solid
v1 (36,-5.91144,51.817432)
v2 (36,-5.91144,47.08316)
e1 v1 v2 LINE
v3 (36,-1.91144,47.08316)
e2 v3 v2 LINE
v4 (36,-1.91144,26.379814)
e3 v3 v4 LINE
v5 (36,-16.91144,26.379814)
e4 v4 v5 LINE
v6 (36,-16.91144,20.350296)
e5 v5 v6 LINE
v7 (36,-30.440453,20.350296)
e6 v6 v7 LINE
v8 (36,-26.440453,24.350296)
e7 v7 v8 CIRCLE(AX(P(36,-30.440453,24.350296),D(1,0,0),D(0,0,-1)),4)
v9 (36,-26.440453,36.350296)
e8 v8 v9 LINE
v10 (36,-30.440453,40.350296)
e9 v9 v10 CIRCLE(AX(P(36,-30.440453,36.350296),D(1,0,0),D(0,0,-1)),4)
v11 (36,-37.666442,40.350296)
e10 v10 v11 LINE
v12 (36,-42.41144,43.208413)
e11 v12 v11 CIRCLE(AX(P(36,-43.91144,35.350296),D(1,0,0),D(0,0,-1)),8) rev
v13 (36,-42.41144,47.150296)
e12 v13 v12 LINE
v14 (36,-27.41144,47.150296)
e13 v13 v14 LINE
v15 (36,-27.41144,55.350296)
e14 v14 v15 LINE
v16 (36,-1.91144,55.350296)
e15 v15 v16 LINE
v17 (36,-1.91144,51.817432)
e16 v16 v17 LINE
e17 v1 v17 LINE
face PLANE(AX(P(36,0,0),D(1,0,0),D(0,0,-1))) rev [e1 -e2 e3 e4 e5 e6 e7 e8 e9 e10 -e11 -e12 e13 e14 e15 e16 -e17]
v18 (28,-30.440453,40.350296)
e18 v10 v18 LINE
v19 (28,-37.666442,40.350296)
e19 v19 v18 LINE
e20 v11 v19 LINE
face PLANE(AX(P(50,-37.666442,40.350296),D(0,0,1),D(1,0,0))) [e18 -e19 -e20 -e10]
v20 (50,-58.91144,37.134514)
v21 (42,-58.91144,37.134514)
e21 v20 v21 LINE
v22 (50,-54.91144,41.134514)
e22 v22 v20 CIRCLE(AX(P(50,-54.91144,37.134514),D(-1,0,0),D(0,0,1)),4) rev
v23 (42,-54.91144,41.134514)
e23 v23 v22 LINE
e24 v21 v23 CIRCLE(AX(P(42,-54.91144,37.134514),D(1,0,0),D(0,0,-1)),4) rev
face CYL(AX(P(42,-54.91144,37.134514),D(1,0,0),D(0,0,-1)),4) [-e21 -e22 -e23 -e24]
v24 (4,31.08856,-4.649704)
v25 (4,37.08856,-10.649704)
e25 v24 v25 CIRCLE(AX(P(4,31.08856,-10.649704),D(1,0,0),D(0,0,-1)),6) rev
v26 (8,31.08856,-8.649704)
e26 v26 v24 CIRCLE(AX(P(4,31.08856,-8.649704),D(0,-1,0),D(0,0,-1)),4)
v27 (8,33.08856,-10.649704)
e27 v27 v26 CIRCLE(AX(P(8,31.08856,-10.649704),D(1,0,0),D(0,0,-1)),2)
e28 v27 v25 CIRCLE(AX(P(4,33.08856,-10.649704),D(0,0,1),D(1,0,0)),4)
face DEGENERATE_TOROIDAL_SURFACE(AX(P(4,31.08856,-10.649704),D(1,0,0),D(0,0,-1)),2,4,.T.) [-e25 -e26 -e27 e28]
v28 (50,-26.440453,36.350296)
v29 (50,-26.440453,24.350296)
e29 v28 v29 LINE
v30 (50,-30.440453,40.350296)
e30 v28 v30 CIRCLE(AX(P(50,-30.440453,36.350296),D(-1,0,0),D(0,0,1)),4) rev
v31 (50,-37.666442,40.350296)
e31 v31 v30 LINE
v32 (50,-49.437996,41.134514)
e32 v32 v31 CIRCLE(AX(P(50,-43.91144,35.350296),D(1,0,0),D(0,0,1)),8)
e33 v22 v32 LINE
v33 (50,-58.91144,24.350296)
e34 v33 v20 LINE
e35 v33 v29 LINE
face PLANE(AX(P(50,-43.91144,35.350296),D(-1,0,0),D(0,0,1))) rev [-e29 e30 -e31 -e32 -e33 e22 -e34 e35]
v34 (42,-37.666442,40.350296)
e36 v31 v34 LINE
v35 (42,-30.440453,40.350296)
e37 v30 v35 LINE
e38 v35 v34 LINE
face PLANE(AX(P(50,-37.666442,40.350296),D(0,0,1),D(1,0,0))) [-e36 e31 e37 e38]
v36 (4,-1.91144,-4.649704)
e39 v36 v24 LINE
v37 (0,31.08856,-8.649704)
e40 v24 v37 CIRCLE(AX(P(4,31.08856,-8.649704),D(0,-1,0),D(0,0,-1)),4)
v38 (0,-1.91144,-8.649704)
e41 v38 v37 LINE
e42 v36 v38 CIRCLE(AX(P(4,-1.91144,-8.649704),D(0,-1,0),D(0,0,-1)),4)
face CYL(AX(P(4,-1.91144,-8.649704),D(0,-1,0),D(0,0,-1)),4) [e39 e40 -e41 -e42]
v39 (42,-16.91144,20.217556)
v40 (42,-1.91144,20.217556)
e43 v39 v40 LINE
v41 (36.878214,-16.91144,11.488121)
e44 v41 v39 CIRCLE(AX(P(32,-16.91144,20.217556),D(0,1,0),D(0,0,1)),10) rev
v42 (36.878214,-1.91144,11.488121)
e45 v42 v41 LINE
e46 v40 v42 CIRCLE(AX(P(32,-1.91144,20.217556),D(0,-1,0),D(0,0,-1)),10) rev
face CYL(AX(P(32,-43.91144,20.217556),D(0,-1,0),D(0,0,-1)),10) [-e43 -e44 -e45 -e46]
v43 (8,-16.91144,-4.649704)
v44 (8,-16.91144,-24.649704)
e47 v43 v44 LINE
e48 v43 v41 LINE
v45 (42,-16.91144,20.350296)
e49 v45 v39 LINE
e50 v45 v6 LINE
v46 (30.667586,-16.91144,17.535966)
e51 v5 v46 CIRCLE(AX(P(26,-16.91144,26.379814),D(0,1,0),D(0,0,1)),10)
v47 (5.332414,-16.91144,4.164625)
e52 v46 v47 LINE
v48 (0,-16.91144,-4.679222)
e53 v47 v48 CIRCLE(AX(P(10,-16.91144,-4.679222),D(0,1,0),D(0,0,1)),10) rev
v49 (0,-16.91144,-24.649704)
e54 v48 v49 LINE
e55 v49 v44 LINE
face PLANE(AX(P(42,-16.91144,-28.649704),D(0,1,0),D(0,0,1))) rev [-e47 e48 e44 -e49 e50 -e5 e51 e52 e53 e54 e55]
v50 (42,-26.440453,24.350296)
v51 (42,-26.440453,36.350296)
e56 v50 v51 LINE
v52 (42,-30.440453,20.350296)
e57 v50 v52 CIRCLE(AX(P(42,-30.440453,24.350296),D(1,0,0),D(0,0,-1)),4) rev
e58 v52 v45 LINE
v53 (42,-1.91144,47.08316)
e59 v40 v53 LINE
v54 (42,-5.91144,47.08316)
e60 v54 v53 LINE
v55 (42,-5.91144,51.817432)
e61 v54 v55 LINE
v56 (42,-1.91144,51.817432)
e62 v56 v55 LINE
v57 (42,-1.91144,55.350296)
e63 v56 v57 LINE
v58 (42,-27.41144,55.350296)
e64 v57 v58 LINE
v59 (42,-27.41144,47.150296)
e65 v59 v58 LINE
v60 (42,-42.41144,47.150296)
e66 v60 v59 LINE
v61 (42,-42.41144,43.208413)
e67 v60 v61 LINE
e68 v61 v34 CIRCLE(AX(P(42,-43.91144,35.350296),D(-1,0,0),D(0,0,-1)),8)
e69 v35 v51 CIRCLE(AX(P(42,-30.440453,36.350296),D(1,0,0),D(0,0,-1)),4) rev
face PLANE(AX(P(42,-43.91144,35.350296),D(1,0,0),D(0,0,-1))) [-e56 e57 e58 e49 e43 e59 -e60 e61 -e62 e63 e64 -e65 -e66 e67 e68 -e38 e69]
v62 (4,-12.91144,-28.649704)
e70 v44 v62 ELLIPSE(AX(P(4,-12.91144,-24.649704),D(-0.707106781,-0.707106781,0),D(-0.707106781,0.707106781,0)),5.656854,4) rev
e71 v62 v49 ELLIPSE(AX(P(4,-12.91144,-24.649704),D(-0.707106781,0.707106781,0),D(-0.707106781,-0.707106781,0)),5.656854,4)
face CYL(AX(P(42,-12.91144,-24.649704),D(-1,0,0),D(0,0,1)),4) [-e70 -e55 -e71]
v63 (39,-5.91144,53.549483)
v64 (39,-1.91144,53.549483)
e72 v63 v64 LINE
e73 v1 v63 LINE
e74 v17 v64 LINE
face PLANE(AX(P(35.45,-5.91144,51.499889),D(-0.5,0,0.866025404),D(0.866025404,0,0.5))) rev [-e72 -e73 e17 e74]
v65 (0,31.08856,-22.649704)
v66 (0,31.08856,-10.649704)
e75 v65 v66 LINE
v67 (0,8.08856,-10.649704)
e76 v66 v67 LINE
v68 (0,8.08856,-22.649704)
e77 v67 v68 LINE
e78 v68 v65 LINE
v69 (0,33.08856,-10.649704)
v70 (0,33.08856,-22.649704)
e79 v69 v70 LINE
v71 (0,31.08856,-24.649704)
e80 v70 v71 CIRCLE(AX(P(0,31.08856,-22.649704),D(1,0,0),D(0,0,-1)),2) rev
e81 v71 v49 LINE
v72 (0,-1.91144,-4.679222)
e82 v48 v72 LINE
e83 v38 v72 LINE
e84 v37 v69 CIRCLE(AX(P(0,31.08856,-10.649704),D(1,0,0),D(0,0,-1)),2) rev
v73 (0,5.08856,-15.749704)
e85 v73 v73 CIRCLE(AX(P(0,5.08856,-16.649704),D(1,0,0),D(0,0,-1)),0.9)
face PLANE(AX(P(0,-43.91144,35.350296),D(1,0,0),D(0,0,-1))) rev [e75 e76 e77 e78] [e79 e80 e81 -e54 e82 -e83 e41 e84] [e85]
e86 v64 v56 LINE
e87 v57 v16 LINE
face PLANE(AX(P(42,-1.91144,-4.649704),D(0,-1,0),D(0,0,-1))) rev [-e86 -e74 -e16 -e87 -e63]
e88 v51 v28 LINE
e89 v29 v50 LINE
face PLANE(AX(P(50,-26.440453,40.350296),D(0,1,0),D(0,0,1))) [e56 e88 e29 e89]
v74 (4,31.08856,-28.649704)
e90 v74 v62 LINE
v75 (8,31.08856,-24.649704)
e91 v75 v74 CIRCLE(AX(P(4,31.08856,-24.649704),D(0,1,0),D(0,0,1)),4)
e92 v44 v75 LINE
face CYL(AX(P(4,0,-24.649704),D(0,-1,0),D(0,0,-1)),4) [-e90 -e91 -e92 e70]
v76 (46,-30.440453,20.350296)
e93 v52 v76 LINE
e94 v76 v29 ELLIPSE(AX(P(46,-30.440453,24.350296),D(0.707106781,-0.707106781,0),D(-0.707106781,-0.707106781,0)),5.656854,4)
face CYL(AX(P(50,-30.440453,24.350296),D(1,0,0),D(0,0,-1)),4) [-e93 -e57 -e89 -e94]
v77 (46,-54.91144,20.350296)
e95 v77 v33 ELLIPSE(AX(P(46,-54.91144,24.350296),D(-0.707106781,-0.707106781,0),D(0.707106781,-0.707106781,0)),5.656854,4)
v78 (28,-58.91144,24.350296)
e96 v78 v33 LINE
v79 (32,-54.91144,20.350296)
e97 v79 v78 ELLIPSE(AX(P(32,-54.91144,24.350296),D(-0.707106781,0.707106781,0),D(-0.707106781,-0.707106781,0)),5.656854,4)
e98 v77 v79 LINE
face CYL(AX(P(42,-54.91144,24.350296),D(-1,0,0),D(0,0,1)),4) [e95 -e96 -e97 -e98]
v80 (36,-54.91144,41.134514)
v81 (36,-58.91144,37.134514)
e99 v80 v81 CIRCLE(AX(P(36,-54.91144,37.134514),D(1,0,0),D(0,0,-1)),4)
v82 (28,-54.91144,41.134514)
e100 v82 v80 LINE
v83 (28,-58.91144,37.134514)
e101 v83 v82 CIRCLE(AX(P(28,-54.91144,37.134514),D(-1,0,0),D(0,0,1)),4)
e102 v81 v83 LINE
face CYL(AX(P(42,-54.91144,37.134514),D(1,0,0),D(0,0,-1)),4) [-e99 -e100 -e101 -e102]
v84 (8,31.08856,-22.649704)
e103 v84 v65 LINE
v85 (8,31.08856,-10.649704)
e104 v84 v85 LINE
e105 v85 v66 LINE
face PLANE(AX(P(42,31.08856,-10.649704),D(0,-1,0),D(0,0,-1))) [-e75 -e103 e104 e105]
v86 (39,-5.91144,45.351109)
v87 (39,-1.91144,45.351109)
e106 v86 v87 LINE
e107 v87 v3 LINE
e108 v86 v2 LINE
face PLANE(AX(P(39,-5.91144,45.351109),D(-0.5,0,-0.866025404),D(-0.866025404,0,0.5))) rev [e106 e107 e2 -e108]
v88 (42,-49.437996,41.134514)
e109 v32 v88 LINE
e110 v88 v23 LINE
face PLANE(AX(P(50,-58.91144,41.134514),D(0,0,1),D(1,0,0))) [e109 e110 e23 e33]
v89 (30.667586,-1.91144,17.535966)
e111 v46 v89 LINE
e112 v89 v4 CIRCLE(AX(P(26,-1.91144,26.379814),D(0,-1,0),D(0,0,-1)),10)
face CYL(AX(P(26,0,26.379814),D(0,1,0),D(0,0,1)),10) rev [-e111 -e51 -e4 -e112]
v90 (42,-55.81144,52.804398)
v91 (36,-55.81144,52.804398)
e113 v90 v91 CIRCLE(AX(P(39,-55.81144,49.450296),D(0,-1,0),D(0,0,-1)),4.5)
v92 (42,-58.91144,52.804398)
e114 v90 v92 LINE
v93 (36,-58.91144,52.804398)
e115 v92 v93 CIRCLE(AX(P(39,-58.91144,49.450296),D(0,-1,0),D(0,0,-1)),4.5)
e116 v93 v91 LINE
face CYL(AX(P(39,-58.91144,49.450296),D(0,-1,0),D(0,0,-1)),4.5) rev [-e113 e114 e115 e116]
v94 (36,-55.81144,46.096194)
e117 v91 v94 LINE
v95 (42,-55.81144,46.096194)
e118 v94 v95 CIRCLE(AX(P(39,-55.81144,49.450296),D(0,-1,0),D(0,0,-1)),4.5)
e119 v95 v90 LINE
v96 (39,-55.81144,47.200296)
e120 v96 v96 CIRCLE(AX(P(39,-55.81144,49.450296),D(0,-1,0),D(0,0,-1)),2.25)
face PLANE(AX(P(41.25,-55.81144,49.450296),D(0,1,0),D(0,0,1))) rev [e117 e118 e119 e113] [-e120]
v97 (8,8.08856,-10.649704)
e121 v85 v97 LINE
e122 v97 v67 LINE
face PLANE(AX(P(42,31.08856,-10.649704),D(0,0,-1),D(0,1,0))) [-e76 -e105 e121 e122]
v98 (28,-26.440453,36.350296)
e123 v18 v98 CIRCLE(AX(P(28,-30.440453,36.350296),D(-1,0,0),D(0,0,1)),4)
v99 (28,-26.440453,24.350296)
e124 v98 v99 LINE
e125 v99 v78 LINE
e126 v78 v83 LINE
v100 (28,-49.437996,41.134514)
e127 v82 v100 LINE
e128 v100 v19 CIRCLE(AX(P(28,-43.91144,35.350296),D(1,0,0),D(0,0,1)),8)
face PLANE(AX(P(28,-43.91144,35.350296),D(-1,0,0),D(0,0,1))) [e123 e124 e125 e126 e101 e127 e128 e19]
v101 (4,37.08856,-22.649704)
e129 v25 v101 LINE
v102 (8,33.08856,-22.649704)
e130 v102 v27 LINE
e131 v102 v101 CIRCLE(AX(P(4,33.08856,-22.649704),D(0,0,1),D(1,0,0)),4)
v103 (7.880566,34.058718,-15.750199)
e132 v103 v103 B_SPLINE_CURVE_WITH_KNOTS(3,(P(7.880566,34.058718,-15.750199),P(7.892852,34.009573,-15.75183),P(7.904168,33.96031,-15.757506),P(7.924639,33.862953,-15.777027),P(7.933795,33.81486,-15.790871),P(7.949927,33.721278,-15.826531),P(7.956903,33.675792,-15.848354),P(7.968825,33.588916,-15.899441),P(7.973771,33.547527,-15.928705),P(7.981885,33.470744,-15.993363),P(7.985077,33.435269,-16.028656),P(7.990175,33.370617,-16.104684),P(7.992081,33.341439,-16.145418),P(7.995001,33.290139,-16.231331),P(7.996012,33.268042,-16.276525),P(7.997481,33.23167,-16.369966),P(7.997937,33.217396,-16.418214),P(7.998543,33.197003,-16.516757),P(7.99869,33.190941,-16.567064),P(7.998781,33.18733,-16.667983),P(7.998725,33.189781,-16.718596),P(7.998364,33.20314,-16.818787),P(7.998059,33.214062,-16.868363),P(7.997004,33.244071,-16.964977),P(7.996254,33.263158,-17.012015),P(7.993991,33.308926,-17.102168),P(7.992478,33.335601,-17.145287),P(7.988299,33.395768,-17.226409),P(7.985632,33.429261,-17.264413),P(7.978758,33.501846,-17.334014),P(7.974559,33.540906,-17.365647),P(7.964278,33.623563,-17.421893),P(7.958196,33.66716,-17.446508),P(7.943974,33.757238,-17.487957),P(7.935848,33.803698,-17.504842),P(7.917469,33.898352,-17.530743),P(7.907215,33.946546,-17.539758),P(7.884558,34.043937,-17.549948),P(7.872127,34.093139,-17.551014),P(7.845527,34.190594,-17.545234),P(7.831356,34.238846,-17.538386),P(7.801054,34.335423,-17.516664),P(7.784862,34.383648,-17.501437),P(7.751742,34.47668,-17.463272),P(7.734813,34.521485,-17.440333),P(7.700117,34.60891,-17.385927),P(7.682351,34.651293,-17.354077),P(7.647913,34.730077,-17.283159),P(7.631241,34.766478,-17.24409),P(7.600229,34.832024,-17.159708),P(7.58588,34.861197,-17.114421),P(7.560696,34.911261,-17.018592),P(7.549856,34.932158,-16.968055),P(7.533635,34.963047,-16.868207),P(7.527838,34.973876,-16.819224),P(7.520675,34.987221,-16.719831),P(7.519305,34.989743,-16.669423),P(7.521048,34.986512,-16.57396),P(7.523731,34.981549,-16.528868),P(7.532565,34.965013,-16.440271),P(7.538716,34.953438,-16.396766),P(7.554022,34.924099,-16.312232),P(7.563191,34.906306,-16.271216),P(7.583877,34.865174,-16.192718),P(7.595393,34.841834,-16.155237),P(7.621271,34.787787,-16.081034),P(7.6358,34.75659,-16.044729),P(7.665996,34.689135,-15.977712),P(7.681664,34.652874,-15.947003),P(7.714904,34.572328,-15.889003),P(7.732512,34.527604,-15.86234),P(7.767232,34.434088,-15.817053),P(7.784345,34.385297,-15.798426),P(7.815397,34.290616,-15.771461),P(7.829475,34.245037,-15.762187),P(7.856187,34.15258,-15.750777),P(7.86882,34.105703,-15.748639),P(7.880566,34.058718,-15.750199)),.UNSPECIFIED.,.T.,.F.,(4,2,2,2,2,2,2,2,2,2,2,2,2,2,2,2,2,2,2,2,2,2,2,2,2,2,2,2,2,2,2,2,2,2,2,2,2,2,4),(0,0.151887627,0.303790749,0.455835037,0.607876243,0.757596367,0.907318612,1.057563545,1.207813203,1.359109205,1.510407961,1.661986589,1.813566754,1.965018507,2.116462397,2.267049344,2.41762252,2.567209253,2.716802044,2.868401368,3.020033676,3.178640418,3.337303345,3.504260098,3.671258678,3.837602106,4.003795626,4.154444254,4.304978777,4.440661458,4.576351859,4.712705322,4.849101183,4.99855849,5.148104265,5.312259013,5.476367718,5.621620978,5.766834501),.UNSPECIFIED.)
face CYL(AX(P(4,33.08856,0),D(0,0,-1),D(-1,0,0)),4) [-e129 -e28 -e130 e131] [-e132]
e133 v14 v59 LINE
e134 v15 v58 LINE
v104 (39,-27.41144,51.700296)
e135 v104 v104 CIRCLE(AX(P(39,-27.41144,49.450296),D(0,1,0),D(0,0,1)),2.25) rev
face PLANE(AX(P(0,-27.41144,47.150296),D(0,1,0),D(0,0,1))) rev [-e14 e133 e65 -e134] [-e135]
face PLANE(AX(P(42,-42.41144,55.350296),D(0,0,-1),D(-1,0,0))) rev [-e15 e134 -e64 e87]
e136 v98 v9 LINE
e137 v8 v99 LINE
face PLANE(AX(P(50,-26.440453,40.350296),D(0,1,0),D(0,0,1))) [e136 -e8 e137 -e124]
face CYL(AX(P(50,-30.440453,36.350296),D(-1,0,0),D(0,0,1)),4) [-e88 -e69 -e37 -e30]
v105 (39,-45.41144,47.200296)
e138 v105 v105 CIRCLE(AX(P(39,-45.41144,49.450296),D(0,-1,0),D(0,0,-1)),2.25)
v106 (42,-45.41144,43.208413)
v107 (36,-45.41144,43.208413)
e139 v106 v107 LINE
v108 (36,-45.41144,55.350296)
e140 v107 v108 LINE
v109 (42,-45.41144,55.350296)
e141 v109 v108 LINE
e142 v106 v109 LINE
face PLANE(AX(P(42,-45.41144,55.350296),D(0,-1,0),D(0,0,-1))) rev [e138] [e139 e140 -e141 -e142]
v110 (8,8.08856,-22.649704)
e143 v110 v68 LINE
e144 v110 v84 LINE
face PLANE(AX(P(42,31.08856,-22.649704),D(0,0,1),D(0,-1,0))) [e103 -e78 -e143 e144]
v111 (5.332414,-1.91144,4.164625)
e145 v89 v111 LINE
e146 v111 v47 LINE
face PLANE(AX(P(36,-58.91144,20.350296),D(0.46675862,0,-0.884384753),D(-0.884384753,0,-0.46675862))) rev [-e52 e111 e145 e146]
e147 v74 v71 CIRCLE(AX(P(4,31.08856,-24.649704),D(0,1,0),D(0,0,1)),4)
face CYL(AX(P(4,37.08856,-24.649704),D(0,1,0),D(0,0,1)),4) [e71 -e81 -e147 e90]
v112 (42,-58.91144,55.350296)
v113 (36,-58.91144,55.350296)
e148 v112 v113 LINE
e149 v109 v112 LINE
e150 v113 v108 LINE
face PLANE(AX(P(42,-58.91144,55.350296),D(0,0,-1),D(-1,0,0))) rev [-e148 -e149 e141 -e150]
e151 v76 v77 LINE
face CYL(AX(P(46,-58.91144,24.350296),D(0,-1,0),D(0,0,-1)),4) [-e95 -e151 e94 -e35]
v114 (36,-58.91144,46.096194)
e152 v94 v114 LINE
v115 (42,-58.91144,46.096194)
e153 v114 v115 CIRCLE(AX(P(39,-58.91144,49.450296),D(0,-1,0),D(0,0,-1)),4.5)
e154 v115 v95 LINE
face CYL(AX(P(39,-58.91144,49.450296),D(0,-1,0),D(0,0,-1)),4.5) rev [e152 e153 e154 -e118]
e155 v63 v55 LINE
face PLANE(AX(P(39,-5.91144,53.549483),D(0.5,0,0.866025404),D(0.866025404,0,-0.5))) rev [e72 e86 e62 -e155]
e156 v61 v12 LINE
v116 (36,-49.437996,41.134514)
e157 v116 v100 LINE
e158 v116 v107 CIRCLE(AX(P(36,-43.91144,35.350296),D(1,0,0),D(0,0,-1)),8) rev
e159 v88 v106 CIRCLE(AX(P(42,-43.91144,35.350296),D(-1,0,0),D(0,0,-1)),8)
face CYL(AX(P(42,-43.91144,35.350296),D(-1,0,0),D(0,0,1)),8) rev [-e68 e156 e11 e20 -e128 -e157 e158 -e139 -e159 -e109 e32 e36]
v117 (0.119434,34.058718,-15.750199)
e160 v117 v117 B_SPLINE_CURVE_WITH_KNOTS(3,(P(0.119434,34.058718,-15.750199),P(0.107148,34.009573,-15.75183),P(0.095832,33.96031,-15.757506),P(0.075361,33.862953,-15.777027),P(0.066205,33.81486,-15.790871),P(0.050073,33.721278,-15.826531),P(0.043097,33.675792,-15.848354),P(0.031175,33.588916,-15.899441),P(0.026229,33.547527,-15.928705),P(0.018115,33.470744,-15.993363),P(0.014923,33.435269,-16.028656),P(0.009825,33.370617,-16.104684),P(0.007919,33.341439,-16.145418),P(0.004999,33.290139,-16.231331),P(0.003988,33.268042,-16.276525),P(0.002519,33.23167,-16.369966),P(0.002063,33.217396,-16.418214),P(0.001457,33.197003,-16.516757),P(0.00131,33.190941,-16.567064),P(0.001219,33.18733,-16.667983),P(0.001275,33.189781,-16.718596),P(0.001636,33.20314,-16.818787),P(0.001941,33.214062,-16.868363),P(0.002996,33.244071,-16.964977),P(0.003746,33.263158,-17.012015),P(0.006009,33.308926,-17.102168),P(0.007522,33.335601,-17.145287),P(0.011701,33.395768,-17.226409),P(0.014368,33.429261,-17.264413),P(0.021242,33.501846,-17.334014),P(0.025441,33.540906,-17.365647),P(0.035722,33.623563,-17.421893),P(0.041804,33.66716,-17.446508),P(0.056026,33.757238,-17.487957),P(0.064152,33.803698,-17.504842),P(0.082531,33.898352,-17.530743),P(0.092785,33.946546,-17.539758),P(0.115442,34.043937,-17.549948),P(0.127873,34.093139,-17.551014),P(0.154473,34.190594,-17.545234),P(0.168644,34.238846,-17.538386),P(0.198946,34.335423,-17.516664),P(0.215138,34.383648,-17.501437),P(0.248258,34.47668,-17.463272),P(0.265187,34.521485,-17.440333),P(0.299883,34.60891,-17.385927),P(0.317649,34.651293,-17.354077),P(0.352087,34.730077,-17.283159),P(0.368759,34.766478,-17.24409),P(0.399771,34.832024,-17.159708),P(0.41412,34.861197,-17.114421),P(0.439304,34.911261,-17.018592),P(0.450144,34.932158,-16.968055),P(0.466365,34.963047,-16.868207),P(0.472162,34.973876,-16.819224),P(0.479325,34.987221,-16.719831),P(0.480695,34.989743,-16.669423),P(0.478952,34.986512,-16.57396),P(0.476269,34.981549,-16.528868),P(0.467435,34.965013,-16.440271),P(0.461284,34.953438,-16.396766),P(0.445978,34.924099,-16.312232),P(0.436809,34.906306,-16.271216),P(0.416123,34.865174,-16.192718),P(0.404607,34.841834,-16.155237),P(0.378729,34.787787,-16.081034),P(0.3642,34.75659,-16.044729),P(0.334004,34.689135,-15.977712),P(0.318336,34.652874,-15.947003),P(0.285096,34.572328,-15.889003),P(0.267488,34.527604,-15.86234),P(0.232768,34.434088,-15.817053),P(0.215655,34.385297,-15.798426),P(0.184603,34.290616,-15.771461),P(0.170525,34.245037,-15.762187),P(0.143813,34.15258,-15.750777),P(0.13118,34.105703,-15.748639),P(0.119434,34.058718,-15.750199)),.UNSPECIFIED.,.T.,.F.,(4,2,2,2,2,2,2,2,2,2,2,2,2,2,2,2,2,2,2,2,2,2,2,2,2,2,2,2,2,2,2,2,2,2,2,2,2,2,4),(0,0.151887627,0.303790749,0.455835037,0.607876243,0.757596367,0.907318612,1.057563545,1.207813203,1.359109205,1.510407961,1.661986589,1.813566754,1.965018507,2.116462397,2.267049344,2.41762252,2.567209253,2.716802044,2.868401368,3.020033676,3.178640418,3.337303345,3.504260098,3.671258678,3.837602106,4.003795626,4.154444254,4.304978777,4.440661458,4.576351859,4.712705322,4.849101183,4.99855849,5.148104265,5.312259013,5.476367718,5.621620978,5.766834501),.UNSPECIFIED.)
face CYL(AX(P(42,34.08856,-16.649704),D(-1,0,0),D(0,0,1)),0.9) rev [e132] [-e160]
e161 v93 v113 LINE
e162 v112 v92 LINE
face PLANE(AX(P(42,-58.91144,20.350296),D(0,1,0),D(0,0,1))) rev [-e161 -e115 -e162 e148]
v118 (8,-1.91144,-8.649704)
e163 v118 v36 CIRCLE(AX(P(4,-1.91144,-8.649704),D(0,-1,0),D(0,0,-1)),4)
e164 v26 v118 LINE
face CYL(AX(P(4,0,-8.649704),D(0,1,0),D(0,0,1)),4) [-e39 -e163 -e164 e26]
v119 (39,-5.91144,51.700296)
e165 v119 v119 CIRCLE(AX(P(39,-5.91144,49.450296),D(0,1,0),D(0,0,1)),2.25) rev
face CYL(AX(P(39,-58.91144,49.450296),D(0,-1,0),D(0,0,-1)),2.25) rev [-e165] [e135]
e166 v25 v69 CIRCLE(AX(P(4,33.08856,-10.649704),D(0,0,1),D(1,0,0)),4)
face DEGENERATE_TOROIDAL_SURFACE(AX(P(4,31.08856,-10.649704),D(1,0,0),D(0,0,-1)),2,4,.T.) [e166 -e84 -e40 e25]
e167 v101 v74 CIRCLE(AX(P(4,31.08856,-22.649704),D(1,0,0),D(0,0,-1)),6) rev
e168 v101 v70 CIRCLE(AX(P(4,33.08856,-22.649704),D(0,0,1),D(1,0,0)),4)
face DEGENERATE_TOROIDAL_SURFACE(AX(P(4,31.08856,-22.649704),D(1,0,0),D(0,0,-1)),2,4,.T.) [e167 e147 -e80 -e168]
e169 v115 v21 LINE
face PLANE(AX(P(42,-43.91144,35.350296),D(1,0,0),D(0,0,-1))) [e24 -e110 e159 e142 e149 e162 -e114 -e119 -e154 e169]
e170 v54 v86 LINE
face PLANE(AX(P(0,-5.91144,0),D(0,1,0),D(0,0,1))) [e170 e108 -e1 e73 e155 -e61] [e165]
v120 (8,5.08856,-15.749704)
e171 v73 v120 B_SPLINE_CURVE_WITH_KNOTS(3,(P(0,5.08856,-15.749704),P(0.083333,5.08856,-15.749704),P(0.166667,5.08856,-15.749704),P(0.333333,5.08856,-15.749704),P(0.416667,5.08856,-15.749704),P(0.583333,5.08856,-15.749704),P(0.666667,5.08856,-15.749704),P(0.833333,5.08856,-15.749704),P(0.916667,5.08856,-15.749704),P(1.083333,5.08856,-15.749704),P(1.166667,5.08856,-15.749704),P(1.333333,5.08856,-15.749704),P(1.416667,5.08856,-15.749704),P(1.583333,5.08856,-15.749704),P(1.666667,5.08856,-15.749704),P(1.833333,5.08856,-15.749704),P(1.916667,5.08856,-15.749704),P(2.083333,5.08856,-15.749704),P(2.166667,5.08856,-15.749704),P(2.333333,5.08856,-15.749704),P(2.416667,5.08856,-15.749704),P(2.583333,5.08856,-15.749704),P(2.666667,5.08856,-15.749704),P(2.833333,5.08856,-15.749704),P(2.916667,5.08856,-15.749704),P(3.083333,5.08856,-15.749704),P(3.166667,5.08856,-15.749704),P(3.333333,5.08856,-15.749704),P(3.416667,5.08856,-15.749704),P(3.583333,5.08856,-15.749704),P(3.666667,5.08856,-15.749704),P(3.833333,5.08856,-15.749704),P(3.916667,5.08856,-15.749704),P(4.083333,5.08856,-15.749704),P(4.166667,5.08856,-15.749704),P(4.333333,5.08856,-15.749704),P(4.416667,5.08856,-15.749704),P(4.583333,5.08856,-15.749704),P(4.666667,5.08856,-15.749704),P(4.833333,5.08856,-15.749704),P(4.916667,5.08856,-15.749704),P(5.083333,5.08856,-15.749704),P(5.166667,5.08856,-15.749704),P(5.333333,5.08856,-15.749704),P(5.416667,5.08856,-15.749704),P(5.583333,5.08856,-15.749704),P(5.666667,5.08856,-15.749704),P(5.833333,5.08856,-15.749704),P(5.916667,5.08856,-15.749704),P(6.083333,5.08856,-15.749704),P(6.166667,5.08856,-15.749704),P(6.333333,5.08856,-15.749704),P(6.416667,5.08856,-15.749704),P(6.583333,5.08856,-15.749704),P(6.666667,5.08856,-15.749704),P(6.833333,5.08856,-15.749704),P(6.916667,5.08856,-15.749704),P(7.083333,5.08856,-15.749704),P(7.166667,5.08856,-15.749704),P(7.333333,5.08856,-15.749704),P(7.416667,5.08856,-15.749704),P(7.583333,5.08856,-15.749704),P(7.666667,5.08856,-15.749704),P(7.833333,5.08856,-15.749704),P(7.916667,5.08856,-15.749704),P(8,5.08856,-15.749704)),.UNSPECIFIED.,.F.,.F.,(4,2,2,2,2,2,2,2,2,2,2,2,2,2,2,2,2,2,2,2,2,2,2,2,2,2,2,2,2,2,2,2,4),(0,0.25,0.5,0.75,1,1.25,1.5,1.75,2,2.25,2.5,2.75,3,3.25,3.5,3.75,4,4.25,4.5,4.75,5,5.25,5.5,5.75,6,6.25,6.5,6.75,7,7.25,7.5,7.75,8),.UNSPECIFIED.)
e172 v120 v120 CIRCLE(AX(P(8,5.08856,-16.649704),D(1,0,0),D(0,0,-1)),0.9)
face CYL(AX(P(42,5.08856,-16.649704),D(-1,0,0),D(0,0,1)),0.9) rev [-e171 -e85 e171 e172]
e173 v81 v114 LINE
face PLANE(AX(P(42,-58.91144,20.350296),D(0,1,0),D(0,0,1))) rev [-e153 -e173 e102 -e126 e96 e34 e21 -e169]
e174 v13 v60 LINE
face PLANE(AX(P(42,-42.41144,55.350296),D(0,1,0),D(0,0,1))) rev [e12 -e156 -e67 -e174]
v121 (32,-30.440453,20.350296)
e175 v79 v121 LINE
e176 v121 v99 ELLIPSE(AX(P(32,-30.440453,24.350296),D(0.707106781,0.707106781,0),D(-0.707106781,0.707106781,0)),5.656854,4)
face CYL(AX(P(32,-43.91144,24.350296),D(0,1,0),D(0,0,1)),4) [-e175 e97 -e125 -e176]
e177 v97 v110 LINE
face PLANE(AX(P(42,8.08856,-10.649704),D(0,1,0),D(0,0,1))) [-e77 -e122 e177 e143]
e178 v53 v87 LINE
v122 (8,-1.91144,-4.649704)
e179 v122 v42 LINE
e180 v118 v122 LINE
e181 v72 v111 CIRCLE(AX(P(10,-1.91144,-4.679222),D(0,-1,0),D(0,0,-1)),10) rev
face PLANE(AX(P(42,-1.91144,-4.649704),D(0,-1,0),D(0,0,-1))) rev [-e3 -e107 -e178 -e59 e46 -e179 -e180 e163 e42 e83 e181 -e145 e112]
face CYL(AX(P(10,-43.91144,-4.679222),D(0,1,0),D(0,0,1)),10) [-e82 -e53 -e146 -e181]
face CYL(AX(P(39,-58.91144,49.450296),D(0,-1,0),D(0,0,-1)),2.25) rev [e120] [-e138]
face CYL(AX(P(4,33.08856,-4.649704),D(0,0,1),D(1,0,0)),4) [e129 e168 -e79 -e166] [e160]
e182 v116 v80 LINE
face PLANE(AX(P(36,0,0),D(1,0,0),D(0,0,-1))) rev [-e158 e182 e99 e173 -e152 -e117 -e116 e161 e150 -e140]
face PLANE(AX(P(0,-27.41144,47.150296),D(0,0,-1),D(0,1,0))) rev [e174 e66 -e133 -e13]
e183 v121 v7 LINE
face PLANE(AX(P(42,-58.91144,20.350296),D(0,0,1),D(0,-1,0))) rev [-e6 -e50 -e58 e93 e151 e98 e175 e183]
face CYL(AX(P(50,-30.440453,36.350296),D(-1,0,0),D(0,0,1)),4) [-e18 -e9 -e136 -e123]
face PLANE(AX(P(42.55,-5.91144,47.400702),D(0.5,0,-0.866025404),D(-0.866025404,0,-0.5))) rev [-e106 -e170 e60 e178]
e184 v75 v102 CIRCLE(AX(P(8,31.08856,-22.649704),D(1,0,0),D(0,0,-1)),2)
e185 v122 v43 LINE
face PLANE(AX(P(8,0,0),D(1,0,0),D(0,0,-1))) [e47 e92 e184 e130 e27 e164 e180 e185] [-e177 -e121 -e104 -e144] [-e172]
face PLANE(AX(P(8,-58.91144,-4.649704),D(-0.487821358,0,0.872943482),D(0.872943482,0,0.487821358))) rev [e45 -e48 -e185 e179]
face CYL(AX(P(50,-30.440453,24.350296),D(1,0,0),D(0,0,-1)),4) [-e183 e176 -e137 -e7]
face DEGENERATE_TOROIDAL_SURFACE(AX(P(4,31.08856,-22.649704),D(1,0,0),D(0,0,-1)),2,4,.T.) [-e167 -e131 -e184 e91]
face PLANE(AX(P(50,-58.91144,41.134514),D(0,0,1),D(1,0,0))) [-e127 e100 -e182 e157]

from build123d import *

# Parameters (mm, degrees)
SKETCH1_R                                        = 0.9
SKETCH1_W                                        = 12
SKETCH1_H                                        = 23
BOSS_EXTRUDE1_DEPTH                              = 42
CBORE_FOR_M4_PAN_HEAD_MACHINE_SCREW2_D           = 4.5
CBORE_FOR_M4_PAN_HEAD_MACHINE_SCREW2_CBORE_D     = 9
CBORE_FOR_M4_PAN_HEAD_MACHINE_SCREW2_CBORE_DEPTH = 3.1
CUT_EXTRUDE2_DEPTH                               = 4
SKETCH11_W                                       = 35
SKETCH11_H                                       = 57
CUT_EXTRUDE3_DEPTH                               = 36
SKETCH12_W                                       = 24
SKETCH12_H                                       = 54
CUT_EXTRUDE4_DEPTH                               = 34
BOSS_EXTRUDE2_DEPTH                              = 8
BOSS_EXTRUDE2_DEPTH_BACK                         = 14
FILLET3_R                                        = 4
SKETCH14_W                                       = 8.2
SKETCH14_H                                       = 15
CUT_EXTRUDE5_DEPTH                               = 92.094527719
FILLET4_R                                        = 6
FILLET5_R                                        = 4
CUT_EXTRUDE6_DEPTH                               = 94.87574371
FILLET6_R                                        = 10


with BuildPart() as part:
    # Sketch1 → Boss-Extrude1 (new body)
    with BuildSketch(Plane(origin=(0, 0, 0), x_dir=(0, 0, -1), z_dir=(1, 0, 0))):
        with BuildLine():
            Line((-55.350295908, -42.411439664), (-43.208412731, -42.411439664))
            ThreePointArc((-43.208412731, -42.411439664), (-27.350295908, -43.911439664), (-43.208412731, -45.411439664))
            Line((-43.208412731, -45.411439664), (-55.350295908, -45.411439664))
            Line((-55.350295908, -45.411439664), (-55.350295908, -58.911439664))
            Line((-55.350295908, -58.911439664), (-20.350295908, -58.911439664))
            Line((-20.350295908, -58.911439664), (-20.350295908, -16.911439664))
            Line((-20.350295908, -16.911439664), (28.649704092, -16.911439664))
            Line((28.649704092, -16.911439664), (28.649704092, 37.088560336))
            Line((28.649704092, 37.088560336), (4.649704092, 37.088560336))
            Line((4.649704092, 37.088560336), (4.649704092, -1.911439664))
            Line((4.649704092, -1.911439664), (-55.350295908, -1.911439664))
            Line((-55.350295908, -1.911439664), (-55.350295908, -28.911439664))
            Line((-55.350295908, -28.911439664), (-55.350295908, -42.411439664))
        make_face()
        with Locations(Location((16.649704092, 34.088560336, 0), (0, 0, 180))):
            Circle(SKETCH1_R, mode=Mode.SUBTRACT)
        with Locations(Location((16.649704092, 5.088560336, 0), (0, 0, 180))):
            Circle(SKETCH1_R, mode=Mode.SUBTRACT)
        with Locations((16.649704092, 19.588560336)):
            Rectangle(SKETCH1_W, SKETCH1_H, mode=Mode.SUBTRACT)
    extrude(amount=BOSS_EXTRUDE1_DEPTH)

    # CBORE for M4 Pan Head Machine Screw2 (through all)
    with Locations(Plane(origin=(0, -58.911439664, 0), x_dir=(-1, 0, 0), z_dir=(0, -1, 0))):
        with Locations((-39, -49.450295908)):
            CounterBoreHole(CBORE_FOR_M4_PAN_HEAD_MACHINE_SCREW2_D / 2, CBORE_FOR_M4_PAN_HEAD_MACHINE_SCREW2_CBORE_D / 2, CBORE_FOR_M4_PAN_HEAD_MACHINE_SCREW2_CBORE_DEPTH)

    # Sketch7 → Cut-Extrude2 (cut)
    with BuildSketch(Plane(origin=(0, -1.911439664, 0), x_dir=(1, 0, 0), z_dir=(0, 1, 0))):
        Polygon((42.55, -51.499889363), (42.55, -47.400702452), (39, -45.351108997), (35.45, -47.400702452), (35.45, -51.499889363), (39, -53.549482819), align=None)
    extrude(amount=-CUT_EXTRUDE2_DEPTH, mode=Mode.SUBTRACT)

    # Sketch11 → Cut-Extrude3 (cut)
    with BuildSketch(Plane.ZY):
        with Locations((37.850295908, -30.411439664)):
            Rectangle(SKETCH11_W, SKETCH11_H)
    extrude(amount=-CUT_EXTRUDE3_DEPTH, mode=Mode.SUBTRACT)

    # Sketch12 → Cut-Extrude4 (cut)
    with BuildSketch(Plane(origin=(42, 0, 0), x_dir=(0, 0, -1), z_dir=(1, 0, 0))):
        with Locations((16.649704092, 10.088560336)):
            Rectangle(SKETCH12_W, SKETCH12_H)
    extrude(amount=-CUT_EXTRUDE4_DEPTH, mode=Mode.SUBTRACT)

    # Sketch13 → Boss-Extrude2 (add, two sides: drawn at the far end of the back side and taken through both)
    with BuildSketch(Plane.ZY.offset(-36).offset(-BOSS_EXTRUDE2_DEPTH_BACK)):
        with BuildLine():
            Line((40.350295908, -37.666441665), (40.350295908, -26.440452892))
            Line((40.350295908, -26.440452892), (20.350295908, -26.440452892))
            Line((20.350295908, -26.440452892), (20.350295908, -58.911439664))
            Line((20.350295908, -58.911439664), (41.134513551, -58.911439664))
            Line((41.134513551, -58.911439664), (41.134513551, -49.437996119))
            ThreePointArc((41.134513551, -49.437996119), (27.36798978, -44.443218651), (40.350295908, -37.666441665))
        make_face()
    extrude(amount=BOSS_EXTRUDE2_DEPTH + BOSS_EXTRUDE2_DEPTH_BACK)

    # Fillet3
    fillet3_edges = [part.edges().sort_by_distance(p)[0] for p in [
        (32, -58.911439664, 41.134513551),
        (32, -26.440452892, 20.350295908),
        (32, -26.440452892, 40.350295908),
        (46, -58.911439664, 41.134513551),
        (50, -42.675946278, 20.350295908),
        (46, -26.440452892, 20.350295908),
        (46, -26.440452892, 40.350295908),
        (28, -42.675946278, 20.350295908),
        (39, -58.911439664, 20.350295908),
    ]]
    fillet(fillet3_edges, radius=FILLET3_R)

    # Sketch14 → Cut-Extrude5 (cut, through all)
    with BuildSketch(Plane(origin=(42, 0, 0), x_dir=(0, 0, -1), z_dir=(1, 0, 0))):
        with Locations((-51.250295908, -34.911439664)):
            Rectangle(SKETCH14_W, SKETCH14_H)
    extrude(amount=-CUT_EXTRUDE5_DEPTH, mode=Mode.SUBTRACT)

    # Fillet4
    fillet4_edges = [part.edges().sort_by_distance(p)[0] for p in [
        (4, 37.088560336, -4.649704092),
        (4, 37.088560336, -28.649704092),
    ]]
    fillet(fillet4_edges, radius=FILLET4_R)

    # Fillet5
    # the kernel refuses this fillet: 4 mm, written as the material it takes off along each edge
    with BuildSketch(Plane(origin=(0, 31.088560336, -4.649704092), x_dir=(0, 0, -1), z_dir=(0, -1, 0))) as fillet5_piece_1:
        with BuildLine():
            CenterArc((FILLET5_R, FILLET5_R), FILLET5_R, 180, 90)
            Line((0, FILLET5_R), (0, 0))
            Line((0, 0), (FILLET5_R, 0))
        make_face()
    extrude(amount=33, mode=Mode.SUBTRACT)
    with BuildSketch(Plane(origin=(0, 31.088560336, -10.649704092), x_dir=(0, 0, 1), z_dir=(0, -1, 0))) as fillet5_piece_2:
        with BuildLine():
            CenterArc((6 - FILLET5_R, -FILLET5_R), FILLET5_R, 0, 90)
            Line((6, -FILLET5_R), (6, 0))
            Line((6, 0), (6 - FILLET5_R, 0))
        make_face()
    revolve(axis=Axis((0, 31.088560336, -10.649704092), (-1, 0, 0)), revolution_arc=90, mode=Mode.SUBTRACT)
    with BuildSketch(Plane(origin=(0, 37.088560336, -22.649704092), x_dir=(0, -1, 0), z_dir=(0, 0, 1))) as fillet5_piece_3:
        with BuildLine():
            CenterArc((FILLET5_R, FILLET5_R), FILLET5_R, 180, 90)
            Line((0, FILLET5_R), (0, 0))
            Line((0, 0), (FILLET5_R, 0))
        make_face()
    extrude(amount=12, mode=Mode.SUBTRACT)
    with BuildSketch(Plane(origin=(0, 31.088560336, -22.649704092), x_dir=(0, 0, -1), z_dir=(0, -1, 0))) as fillet5_piece_4:
        with BuildLine():
            CenterArc((6 - FILLET5_R, FILLET5_R), FILLET5_R, 270, 90)
            Line((6, FILLET5_R), (6, 0))
            Line((6, 0), (6 - FILLET5_R, 0))
        make_face()
    revolve(axis=Axis((0, 31.088560336, -22.649704092), (1, 0, 0)), revolution_arc=90, mode=Mode.SUBTRACT)
    with BuildSketch(Plane(origin=(8, -1.911439664, -4.649704092), x_dir=(-1, 0, 0), z_dir=(0, 1, 0))) as fillet5_piece_5:
        with BuildLine():
            CenterArc((FILLET5_R, -FILLET5_R), FILLET5_R, 90, 90)
            Line((0, -FILLET5_R), (0, 0))
            Line((0, 0), (FILLET5_R, 0))
        make_face()
    extrude(amount=33, mode=Mode.SUBTRACT)
    with BuildSketch(Plane(origin=(8, 31.088560336, -10.649704092), x_dir=(0, 0, 1), z_dir=(0, -1, 0))) as fillet5_piece_6:
        with BuildLine():
            CenterArc((6 - FILLET5_R, FILLET5_R), FILLET5_R, 270, 90)
            Line((6 - FILLET5_R, 0), (6, 0))
            Line((6, 0), (6, FILLET5_R))
        make_face()
    revolve(axis=Axis((8, 31.088560336, -10.649704092), (-1, 0, 0)), revolution_arc=90, mode=Mode.SUBTRACT)
    with BuildSketch(Plane(origin=(8, 37.088560336, -10.649704092), x_dir=(-1, 0, 0), z_dir=(0, 0, -1))) as fillet5_piece_7:
        with BuildLine():
            CenterArc((FILLET5_R, -FILLET5_R), FILLET5_R, 90, 90)
            Line((0, -FILLET5_R), (0, 0))
            Line((0, 0), (FILLET5_R, 0))
        make_face()
    extrude(amount=12, mode=Mode.SUBTRACT)
    with BuildSketch(Plane(origin=(8, 31.088560336, -22.649704092), x_dir=(0, 0, -1), z_dir=(0, -1, 0))) as fillet5_piece_8:
        with BuildLine():
            CenterArc((6 - FILLET5_R, -FILLET5_R), FILLET5_R, 0, 90)
            Line((6 - FILLET5_R, 0), (6, 0))
            Line((6, 0), (6, -FILLET5_R))
        make_face()
    revolve(axis=Axis((8, 31.088560336, -22.649704092), (1, 0, 0)), revolution_arc=90, mode=Mode.SUBTRACT)
    with BuildSketch(Plane(origin=(0, -26.911439664, -28.649704092), x_dir=(0, 0, 1), z_dir=(0, 1, 0))) as fillet5_piece_9:
        with BuildLine():
            CenterArc((FILLET5_R, FILLET5_R), FILLET5_R, 180, 90)
            Line((0, FILLET5_R), (0, 0))
            Line((0, 0), (FILLET5_R, 0))
        make_face()
    extrude(amount=58, mode=Mode.SUBTRACT)
    with BuildSketch(Plane(origin=(8, 31.088560336, -28.649704092), x_dir=(-1, 0, 0), z_dir=(0, -1, 0))) as fillet5_piece_10:
        with BuildLine():
            CenterArc((FILLET5_R, -FILLET5_R), FILLET5_R, 90, 90)
            Line((0, -FILLET5_R), (0, 0))
            Line((0, 0), (FILLET5_R, 0))
        make_face()
    extrude(amount=58, mode=Mode.SUBTRACT)
    with BuildSketch(Plane(origin=(-10, -16.911439664, -28.649704092), x_dir=(0, 1, 0), z_dir=(1, 0, 0))) as fillet5_piece_11:
        with BuildLine():
            CenterArc((FILLET5_R, FILLET5_R), FILLET5_R, 180, 90)
            Line((0, FILLET5_R), (0, 0))
            Line((0, 0), (FILLET5_R, 0))
        make_face()
    extrude(amount=28, mode=Mode.SUBTRACT)

    # Sketch15 → Cut-Extrude6 (cut, through all)
    with BuildSketch(Plane(origin=(0, -1.911439664, 0), x_dir=(1, 0, 0), z_dir=(0, 1, 0))):
        Polygon((36, -20.350295908), (0, -1.350295908), (0, -20.350295908), align=None)
        Polygon((8, 4.649704092), (42, -14.350295908), (42, 4.649704092), align=None)
    extrude(amount=-CUT_EXTRUDE6_DEPTH, mode=Mode.SUBTRACT)

    # Fillet6
    fillet6_edges = [part.edges().sort_by_distance(p)[0] for p in [
        (36, -9.411439664, 20.350295908),
        (0, -9.411439664, 1.350295908),
        (42, -9.411439664, 14.350295908),
    ]]
    fillet(fillet6_edges, radius=FILLET6_R)


solid = part.part
